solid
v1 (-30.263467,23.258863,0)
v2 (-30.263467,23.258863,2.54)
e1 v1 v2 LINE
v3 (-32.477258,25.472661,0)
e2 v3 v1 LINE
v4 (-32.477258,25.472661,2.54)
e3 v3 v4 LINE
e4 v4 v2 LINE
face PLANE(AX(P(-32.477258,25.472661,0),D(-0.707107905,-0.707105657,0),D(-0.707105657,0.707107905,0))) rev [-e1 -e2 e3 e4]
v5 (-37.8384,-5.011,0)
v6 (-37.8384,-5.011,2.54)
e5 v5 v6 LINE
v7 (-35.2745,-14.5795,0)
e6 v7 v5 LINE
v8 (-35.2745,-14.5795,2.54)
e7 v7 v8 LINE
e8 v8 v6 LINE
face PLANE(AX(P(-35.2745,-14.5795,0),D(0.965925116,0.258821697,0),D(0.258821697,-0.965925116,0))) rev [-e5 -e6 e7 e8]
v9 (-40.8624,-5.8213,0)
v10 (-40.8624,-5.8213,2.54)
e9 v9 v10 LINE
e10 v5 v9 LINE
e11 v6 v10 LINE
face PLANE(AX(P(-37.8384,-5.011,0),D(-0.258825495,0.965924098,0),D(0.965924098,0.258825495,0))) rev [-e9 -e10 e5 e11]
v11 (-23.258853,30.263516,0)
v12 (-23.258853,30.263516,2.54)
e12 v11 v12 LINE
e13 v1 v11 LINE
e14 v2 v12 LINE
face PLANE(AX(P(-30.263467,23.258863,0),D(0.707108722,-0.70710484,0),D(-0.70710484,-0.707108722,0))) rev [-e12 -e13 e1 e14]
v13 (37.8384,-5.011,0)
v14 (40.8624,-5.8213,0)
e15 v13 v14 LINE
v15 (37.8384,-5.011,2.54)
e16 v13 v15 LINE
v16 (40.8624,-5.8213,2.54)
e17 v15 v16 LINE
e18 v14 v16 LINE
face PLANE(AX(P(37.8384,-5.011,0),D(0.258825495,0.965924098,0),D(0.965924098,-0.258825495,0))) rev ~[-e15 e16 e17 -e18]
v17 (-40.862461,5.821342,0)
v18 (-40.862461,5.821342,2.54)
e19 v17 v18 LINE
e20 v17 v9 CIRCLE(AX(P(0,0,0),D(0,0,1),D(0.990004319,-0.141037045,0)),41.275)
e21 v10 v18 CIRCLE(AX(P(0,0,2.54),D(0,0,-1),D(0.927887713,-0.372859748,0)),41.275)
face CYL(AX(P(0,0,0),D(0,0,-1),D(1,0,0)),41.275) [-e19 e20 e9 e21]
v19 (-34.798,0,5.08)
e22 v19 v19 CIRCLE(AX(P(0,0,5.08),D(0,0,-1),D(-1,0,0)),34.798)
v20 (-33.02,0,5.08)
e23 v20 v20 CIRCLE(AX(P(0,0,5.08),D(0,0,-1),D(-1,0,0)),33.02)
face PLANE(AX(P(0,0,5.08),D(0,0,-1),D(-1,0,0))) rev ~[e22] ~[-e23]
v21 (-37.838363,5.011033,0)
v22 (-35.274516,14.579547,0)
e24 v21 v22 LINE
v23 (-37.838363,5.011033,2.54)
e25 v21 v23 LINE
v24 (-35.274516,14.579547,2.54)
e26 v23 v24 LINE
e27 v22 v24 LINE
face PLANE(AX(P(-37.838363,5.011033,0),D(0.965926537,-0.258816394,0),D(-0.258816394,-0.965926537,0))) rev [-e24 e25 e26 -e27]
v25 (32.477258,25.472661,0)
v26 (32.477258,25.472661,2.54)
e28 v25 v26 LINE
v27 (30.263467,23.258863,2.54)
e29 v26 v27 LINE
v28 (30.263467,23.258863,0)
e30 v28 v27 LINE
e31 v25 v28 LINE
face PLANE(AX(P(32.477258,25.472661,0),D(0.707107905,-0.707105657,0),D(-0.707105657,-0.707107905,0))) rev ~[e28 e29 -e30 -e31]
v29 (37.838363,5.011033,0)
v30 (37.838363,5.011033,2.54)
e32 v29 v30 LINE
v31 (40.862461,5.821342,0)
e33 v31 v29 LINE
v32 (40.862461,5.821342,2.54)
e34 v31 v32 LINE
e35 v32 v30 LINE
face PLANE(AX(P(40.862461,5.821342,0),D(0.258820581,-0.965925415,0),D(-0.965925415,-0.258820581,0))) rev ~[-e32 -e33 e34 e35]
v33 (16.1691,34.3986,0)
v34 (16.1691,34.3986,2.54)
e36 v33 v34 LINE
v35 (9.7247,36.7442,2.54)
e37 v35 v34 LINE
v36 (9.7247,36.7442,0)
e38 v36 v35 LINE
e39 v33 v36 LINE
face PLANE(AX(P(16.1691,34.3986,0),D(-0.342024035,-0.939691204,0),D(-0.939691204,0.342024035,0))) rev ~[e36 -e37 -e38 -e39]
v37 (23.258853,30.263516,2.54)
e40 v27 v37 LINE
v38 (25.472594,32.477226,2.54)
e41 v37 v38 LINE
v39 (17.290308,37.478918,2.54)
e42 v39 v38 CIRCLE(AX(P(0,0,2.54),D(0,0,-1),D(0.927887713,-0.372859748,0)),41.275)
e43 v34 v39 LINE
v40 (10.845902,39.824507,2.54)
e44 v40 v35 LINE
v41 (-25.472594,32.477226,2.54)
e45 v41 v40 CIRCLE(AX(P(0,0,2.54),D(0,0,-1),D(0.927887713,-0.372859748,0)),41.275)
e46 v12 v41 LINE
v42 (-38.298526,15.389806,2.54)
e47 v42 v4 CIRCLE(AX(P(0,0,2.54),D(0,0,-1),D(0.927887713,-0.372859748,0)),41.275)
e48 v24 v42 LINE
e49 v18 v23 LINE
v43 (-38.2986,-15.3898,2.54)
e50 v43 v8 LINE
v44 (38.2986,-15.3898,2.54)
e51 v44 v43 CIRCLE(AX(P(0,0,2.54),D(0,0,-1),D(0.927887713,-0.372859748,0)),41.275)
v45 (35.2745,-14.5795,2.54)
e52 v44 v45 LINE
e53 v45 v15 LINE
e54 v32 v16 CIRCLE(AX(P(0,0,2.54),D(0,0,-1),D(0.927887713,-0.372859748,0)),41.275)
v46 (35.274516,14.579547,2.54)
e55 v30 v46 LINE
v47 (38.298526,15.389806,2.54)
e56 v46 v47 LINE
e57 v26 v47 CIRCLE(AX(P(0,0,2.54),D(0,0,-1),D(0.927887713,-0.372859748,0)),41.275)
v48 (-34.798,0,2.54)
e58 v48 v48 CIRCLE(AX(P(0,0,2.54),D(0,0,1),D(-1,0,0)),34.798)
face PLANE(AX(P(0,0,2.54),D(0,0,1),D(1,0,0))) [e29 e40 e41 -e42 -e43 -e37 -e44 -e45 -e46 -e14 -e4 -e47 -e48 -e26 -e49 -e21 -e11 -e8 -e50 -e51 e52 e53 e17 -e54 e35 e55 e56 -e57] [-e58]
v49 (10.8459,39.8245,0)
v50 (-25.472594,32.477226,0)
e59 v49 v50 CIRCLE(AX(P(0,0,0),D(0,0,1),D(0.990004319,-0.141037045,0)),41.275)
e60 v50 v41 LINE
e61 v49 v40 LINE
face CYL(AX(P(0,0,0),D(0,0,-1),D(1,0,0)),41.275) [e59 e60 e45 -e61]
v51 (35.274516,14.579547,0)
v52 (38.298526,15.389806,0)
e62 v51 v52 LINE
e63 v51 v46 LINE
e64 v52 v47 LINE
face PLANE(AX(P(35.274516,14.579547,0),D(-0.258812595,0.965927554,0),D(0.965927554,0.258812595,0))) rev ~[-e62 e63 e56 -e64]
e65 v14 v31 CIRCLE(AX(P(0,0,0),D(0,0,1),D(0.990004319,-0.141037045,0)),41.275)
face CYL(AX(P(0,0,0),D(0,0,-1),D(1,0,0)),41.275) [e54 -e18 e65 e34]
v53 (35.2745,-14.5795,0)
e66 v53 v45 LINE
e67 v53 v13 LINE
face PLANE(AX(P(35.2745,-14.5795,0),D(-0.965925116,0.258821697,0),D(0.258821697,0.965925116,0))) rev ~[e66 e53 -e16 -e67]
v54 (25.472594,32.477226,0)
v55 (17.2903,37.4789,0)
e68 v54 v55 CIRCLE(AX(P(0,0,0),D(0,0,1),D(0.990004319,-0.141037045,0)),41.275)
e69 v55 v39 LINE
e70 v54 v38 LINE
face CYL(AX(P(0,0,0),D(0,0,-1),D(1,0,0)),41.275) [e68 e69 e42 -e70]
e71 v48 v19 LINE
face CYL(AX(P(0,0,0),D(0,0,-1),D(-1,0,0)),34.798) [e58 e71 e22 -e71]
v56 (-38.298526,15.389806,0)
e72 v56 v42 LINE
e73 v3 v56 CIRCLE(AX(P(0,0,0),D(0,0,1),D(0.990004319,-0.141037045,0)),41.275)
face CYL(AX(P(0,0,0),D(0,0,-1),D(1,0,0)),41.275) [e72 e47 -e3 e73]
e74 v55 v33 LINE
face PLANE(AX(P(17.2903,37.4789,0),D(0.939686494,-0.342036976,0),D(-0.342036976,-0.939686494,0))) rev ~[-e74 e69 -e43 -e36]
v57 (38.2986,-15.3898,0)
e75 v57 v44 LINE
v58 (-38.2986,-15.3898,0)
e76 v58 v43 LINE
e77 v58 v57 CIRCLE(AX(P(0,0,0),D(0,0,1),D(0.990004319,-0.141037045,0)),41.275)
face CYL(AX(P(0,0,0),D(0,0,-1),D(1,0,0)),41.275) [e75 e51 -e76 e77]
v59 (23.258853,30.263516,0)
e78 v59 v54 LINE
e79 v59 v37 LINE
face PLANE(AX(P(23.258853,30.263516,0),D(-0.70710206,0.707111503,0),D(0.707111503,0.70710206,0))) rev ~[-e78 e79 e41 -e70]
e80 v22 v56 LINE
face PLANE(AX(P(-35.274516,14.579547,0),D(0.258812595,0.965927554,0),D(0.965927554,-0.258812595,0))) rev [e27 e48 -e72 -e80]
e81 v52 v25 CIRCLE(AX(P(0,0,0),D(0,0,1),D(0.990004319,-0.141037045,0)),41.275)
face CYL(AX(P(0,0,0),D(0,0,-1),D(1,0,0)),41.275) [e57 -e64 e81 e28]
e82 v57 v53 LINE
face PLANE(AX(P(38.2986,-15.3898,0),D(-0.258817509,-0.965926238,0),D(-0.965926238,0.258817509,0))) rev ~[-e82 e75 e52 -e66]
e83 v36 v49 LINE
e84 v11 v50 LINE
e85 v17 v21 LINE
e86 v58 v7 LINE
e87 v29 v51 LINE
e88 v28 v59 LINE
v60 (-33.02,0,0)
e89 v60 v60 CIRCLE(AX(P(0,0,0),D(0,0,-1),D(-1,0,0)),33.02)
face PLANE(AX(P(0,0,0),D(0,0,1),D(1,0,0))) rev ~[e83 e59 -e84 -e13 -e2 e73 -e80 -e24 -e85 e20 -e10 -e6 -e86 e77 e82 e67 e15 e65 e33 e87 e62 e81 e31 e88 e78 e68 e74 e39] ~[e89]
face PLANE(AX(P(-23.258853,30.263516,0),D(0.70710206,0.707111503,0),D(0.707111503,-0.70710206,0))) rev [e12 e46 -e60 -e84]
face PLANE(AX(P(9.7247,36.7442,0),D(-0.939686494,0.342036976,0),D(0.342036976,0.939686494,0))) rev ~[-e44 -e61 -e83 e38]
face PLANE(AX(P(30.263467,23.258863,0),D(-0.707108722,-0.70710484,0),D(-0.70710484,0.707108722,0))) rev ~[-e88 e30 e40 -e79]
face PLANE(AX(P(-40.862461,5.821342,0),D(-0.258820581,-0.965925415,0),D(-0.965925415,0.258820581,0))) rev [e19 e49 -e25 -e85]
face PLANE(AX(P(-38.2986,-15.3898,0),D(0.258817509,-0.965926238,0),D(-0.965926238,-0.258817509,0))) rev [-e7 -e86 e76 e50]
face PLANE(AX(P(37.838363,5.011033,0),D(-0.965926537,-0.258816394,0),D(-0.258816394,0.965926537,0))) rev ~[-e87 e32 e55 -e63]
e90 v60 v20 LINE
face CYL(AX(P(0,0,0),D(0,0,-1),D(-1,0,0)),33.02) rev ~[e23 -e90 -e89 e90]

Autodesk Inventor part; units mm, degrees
ref_plane "YZ Plane" through (0, 0, 0) normal (1, 0, 0) x (0, 1, 0)
ref_plane "XZ Plane" through (0, 0, 0) normal (0, 1, 0) x (-1, 0, 0)
ref_plane "XY Plane" through (0, 0, 0) normal (0, 0, 1) x (1, 0, 0)
sketch "Sketch1" plane through (0, 0, 0) normal (0, 0, 1) x (1, 0, 0)
  circle A0 centre (0, 0) radius 34.798
  circle A1 centre (0, 0) radius 41.275
  line L0 (38.2986, -15.3898) -> (35.2745, -14.5795)
  line L1 (35.2745, -14.5795) -> (37.8384, -5.011)
  line L2 (37.8384, -5.011) -> (40.8624, -5.8213)
  line L3 (0, 0) -> (36.5564, -9.7953) construction
  line L4 (0, 0) -> (34.798, 0) construction
  line L5 (36.5564, -9.7953) -> (39.8686, -10.6828) construction
  dimension "d0" = 69.596
  dimension "d1" = 82.55
  dimension "d2" = 15
  dimension "d3" = 9.906
  dimension "d4" = 3.429
extrude "Extrusion1" add sketch "Sketch1" along normal blind 2.54
extrude "Extrusion2" cut sketch "Sketch1" along normal blind 2.54 contours L0 L1 L2 A1 picked at (37.7926, -9.5555)
pattern_circular "Circular Pattern1" count 3 over 60 about axis through (0, 0, 0) along (0, 0, 1) of "Extrusion2"
mirror "Mirror1" about plane through (0, 0, 0) normal (1, 0, 0) of "Extrusion2", "Circular Pattern1"
sketch "Sketch2" plane through (0, 0, 0) normal (0, 0, -1) x (-1, 0, 0)
  circle A0 centre (0, 0) radius 34.798 projected
  circle A1 centre (0, 0) radius 33.02
  dimension "d12" = 66.04
extrude "Extrusion3" add sketch "Sketch2" against normal blind 5.08
sketch "Sketch3" plane through (0, 0, 0) normal (0, 0, -1) x (-1, 0, 0)
  arc A0 (25.4726, 32.4772) -> (-25.4726, 32.4772) centre (0, 0) ccw projected
  line L0 (-17.2903, 37.4789) -> (-16.1691, 34.3986)
  line L1 (-16.1691, 34.3986) -> (-9.7247, 36.7442)
  line L2 (-9.7247, 36.7442) -> (-10.8459, 39.8245)
  line L3 (0, 0) -> (-12.9469, 35.5714) construction
  line L4 (-12.9469, 35.5714) -> (-13.8833, 38.8701) construction
  line L5 (0, 0) -> (13.6723, 0) construction
  dimension "d15" = 3.429
  dimension "d16" = 6.858
  dimension "d17" = 110
extrude "Extrusion4" cut sketch "Sketch3" against normal blind 5.08
properties part number "BallastTankMillOutline"
